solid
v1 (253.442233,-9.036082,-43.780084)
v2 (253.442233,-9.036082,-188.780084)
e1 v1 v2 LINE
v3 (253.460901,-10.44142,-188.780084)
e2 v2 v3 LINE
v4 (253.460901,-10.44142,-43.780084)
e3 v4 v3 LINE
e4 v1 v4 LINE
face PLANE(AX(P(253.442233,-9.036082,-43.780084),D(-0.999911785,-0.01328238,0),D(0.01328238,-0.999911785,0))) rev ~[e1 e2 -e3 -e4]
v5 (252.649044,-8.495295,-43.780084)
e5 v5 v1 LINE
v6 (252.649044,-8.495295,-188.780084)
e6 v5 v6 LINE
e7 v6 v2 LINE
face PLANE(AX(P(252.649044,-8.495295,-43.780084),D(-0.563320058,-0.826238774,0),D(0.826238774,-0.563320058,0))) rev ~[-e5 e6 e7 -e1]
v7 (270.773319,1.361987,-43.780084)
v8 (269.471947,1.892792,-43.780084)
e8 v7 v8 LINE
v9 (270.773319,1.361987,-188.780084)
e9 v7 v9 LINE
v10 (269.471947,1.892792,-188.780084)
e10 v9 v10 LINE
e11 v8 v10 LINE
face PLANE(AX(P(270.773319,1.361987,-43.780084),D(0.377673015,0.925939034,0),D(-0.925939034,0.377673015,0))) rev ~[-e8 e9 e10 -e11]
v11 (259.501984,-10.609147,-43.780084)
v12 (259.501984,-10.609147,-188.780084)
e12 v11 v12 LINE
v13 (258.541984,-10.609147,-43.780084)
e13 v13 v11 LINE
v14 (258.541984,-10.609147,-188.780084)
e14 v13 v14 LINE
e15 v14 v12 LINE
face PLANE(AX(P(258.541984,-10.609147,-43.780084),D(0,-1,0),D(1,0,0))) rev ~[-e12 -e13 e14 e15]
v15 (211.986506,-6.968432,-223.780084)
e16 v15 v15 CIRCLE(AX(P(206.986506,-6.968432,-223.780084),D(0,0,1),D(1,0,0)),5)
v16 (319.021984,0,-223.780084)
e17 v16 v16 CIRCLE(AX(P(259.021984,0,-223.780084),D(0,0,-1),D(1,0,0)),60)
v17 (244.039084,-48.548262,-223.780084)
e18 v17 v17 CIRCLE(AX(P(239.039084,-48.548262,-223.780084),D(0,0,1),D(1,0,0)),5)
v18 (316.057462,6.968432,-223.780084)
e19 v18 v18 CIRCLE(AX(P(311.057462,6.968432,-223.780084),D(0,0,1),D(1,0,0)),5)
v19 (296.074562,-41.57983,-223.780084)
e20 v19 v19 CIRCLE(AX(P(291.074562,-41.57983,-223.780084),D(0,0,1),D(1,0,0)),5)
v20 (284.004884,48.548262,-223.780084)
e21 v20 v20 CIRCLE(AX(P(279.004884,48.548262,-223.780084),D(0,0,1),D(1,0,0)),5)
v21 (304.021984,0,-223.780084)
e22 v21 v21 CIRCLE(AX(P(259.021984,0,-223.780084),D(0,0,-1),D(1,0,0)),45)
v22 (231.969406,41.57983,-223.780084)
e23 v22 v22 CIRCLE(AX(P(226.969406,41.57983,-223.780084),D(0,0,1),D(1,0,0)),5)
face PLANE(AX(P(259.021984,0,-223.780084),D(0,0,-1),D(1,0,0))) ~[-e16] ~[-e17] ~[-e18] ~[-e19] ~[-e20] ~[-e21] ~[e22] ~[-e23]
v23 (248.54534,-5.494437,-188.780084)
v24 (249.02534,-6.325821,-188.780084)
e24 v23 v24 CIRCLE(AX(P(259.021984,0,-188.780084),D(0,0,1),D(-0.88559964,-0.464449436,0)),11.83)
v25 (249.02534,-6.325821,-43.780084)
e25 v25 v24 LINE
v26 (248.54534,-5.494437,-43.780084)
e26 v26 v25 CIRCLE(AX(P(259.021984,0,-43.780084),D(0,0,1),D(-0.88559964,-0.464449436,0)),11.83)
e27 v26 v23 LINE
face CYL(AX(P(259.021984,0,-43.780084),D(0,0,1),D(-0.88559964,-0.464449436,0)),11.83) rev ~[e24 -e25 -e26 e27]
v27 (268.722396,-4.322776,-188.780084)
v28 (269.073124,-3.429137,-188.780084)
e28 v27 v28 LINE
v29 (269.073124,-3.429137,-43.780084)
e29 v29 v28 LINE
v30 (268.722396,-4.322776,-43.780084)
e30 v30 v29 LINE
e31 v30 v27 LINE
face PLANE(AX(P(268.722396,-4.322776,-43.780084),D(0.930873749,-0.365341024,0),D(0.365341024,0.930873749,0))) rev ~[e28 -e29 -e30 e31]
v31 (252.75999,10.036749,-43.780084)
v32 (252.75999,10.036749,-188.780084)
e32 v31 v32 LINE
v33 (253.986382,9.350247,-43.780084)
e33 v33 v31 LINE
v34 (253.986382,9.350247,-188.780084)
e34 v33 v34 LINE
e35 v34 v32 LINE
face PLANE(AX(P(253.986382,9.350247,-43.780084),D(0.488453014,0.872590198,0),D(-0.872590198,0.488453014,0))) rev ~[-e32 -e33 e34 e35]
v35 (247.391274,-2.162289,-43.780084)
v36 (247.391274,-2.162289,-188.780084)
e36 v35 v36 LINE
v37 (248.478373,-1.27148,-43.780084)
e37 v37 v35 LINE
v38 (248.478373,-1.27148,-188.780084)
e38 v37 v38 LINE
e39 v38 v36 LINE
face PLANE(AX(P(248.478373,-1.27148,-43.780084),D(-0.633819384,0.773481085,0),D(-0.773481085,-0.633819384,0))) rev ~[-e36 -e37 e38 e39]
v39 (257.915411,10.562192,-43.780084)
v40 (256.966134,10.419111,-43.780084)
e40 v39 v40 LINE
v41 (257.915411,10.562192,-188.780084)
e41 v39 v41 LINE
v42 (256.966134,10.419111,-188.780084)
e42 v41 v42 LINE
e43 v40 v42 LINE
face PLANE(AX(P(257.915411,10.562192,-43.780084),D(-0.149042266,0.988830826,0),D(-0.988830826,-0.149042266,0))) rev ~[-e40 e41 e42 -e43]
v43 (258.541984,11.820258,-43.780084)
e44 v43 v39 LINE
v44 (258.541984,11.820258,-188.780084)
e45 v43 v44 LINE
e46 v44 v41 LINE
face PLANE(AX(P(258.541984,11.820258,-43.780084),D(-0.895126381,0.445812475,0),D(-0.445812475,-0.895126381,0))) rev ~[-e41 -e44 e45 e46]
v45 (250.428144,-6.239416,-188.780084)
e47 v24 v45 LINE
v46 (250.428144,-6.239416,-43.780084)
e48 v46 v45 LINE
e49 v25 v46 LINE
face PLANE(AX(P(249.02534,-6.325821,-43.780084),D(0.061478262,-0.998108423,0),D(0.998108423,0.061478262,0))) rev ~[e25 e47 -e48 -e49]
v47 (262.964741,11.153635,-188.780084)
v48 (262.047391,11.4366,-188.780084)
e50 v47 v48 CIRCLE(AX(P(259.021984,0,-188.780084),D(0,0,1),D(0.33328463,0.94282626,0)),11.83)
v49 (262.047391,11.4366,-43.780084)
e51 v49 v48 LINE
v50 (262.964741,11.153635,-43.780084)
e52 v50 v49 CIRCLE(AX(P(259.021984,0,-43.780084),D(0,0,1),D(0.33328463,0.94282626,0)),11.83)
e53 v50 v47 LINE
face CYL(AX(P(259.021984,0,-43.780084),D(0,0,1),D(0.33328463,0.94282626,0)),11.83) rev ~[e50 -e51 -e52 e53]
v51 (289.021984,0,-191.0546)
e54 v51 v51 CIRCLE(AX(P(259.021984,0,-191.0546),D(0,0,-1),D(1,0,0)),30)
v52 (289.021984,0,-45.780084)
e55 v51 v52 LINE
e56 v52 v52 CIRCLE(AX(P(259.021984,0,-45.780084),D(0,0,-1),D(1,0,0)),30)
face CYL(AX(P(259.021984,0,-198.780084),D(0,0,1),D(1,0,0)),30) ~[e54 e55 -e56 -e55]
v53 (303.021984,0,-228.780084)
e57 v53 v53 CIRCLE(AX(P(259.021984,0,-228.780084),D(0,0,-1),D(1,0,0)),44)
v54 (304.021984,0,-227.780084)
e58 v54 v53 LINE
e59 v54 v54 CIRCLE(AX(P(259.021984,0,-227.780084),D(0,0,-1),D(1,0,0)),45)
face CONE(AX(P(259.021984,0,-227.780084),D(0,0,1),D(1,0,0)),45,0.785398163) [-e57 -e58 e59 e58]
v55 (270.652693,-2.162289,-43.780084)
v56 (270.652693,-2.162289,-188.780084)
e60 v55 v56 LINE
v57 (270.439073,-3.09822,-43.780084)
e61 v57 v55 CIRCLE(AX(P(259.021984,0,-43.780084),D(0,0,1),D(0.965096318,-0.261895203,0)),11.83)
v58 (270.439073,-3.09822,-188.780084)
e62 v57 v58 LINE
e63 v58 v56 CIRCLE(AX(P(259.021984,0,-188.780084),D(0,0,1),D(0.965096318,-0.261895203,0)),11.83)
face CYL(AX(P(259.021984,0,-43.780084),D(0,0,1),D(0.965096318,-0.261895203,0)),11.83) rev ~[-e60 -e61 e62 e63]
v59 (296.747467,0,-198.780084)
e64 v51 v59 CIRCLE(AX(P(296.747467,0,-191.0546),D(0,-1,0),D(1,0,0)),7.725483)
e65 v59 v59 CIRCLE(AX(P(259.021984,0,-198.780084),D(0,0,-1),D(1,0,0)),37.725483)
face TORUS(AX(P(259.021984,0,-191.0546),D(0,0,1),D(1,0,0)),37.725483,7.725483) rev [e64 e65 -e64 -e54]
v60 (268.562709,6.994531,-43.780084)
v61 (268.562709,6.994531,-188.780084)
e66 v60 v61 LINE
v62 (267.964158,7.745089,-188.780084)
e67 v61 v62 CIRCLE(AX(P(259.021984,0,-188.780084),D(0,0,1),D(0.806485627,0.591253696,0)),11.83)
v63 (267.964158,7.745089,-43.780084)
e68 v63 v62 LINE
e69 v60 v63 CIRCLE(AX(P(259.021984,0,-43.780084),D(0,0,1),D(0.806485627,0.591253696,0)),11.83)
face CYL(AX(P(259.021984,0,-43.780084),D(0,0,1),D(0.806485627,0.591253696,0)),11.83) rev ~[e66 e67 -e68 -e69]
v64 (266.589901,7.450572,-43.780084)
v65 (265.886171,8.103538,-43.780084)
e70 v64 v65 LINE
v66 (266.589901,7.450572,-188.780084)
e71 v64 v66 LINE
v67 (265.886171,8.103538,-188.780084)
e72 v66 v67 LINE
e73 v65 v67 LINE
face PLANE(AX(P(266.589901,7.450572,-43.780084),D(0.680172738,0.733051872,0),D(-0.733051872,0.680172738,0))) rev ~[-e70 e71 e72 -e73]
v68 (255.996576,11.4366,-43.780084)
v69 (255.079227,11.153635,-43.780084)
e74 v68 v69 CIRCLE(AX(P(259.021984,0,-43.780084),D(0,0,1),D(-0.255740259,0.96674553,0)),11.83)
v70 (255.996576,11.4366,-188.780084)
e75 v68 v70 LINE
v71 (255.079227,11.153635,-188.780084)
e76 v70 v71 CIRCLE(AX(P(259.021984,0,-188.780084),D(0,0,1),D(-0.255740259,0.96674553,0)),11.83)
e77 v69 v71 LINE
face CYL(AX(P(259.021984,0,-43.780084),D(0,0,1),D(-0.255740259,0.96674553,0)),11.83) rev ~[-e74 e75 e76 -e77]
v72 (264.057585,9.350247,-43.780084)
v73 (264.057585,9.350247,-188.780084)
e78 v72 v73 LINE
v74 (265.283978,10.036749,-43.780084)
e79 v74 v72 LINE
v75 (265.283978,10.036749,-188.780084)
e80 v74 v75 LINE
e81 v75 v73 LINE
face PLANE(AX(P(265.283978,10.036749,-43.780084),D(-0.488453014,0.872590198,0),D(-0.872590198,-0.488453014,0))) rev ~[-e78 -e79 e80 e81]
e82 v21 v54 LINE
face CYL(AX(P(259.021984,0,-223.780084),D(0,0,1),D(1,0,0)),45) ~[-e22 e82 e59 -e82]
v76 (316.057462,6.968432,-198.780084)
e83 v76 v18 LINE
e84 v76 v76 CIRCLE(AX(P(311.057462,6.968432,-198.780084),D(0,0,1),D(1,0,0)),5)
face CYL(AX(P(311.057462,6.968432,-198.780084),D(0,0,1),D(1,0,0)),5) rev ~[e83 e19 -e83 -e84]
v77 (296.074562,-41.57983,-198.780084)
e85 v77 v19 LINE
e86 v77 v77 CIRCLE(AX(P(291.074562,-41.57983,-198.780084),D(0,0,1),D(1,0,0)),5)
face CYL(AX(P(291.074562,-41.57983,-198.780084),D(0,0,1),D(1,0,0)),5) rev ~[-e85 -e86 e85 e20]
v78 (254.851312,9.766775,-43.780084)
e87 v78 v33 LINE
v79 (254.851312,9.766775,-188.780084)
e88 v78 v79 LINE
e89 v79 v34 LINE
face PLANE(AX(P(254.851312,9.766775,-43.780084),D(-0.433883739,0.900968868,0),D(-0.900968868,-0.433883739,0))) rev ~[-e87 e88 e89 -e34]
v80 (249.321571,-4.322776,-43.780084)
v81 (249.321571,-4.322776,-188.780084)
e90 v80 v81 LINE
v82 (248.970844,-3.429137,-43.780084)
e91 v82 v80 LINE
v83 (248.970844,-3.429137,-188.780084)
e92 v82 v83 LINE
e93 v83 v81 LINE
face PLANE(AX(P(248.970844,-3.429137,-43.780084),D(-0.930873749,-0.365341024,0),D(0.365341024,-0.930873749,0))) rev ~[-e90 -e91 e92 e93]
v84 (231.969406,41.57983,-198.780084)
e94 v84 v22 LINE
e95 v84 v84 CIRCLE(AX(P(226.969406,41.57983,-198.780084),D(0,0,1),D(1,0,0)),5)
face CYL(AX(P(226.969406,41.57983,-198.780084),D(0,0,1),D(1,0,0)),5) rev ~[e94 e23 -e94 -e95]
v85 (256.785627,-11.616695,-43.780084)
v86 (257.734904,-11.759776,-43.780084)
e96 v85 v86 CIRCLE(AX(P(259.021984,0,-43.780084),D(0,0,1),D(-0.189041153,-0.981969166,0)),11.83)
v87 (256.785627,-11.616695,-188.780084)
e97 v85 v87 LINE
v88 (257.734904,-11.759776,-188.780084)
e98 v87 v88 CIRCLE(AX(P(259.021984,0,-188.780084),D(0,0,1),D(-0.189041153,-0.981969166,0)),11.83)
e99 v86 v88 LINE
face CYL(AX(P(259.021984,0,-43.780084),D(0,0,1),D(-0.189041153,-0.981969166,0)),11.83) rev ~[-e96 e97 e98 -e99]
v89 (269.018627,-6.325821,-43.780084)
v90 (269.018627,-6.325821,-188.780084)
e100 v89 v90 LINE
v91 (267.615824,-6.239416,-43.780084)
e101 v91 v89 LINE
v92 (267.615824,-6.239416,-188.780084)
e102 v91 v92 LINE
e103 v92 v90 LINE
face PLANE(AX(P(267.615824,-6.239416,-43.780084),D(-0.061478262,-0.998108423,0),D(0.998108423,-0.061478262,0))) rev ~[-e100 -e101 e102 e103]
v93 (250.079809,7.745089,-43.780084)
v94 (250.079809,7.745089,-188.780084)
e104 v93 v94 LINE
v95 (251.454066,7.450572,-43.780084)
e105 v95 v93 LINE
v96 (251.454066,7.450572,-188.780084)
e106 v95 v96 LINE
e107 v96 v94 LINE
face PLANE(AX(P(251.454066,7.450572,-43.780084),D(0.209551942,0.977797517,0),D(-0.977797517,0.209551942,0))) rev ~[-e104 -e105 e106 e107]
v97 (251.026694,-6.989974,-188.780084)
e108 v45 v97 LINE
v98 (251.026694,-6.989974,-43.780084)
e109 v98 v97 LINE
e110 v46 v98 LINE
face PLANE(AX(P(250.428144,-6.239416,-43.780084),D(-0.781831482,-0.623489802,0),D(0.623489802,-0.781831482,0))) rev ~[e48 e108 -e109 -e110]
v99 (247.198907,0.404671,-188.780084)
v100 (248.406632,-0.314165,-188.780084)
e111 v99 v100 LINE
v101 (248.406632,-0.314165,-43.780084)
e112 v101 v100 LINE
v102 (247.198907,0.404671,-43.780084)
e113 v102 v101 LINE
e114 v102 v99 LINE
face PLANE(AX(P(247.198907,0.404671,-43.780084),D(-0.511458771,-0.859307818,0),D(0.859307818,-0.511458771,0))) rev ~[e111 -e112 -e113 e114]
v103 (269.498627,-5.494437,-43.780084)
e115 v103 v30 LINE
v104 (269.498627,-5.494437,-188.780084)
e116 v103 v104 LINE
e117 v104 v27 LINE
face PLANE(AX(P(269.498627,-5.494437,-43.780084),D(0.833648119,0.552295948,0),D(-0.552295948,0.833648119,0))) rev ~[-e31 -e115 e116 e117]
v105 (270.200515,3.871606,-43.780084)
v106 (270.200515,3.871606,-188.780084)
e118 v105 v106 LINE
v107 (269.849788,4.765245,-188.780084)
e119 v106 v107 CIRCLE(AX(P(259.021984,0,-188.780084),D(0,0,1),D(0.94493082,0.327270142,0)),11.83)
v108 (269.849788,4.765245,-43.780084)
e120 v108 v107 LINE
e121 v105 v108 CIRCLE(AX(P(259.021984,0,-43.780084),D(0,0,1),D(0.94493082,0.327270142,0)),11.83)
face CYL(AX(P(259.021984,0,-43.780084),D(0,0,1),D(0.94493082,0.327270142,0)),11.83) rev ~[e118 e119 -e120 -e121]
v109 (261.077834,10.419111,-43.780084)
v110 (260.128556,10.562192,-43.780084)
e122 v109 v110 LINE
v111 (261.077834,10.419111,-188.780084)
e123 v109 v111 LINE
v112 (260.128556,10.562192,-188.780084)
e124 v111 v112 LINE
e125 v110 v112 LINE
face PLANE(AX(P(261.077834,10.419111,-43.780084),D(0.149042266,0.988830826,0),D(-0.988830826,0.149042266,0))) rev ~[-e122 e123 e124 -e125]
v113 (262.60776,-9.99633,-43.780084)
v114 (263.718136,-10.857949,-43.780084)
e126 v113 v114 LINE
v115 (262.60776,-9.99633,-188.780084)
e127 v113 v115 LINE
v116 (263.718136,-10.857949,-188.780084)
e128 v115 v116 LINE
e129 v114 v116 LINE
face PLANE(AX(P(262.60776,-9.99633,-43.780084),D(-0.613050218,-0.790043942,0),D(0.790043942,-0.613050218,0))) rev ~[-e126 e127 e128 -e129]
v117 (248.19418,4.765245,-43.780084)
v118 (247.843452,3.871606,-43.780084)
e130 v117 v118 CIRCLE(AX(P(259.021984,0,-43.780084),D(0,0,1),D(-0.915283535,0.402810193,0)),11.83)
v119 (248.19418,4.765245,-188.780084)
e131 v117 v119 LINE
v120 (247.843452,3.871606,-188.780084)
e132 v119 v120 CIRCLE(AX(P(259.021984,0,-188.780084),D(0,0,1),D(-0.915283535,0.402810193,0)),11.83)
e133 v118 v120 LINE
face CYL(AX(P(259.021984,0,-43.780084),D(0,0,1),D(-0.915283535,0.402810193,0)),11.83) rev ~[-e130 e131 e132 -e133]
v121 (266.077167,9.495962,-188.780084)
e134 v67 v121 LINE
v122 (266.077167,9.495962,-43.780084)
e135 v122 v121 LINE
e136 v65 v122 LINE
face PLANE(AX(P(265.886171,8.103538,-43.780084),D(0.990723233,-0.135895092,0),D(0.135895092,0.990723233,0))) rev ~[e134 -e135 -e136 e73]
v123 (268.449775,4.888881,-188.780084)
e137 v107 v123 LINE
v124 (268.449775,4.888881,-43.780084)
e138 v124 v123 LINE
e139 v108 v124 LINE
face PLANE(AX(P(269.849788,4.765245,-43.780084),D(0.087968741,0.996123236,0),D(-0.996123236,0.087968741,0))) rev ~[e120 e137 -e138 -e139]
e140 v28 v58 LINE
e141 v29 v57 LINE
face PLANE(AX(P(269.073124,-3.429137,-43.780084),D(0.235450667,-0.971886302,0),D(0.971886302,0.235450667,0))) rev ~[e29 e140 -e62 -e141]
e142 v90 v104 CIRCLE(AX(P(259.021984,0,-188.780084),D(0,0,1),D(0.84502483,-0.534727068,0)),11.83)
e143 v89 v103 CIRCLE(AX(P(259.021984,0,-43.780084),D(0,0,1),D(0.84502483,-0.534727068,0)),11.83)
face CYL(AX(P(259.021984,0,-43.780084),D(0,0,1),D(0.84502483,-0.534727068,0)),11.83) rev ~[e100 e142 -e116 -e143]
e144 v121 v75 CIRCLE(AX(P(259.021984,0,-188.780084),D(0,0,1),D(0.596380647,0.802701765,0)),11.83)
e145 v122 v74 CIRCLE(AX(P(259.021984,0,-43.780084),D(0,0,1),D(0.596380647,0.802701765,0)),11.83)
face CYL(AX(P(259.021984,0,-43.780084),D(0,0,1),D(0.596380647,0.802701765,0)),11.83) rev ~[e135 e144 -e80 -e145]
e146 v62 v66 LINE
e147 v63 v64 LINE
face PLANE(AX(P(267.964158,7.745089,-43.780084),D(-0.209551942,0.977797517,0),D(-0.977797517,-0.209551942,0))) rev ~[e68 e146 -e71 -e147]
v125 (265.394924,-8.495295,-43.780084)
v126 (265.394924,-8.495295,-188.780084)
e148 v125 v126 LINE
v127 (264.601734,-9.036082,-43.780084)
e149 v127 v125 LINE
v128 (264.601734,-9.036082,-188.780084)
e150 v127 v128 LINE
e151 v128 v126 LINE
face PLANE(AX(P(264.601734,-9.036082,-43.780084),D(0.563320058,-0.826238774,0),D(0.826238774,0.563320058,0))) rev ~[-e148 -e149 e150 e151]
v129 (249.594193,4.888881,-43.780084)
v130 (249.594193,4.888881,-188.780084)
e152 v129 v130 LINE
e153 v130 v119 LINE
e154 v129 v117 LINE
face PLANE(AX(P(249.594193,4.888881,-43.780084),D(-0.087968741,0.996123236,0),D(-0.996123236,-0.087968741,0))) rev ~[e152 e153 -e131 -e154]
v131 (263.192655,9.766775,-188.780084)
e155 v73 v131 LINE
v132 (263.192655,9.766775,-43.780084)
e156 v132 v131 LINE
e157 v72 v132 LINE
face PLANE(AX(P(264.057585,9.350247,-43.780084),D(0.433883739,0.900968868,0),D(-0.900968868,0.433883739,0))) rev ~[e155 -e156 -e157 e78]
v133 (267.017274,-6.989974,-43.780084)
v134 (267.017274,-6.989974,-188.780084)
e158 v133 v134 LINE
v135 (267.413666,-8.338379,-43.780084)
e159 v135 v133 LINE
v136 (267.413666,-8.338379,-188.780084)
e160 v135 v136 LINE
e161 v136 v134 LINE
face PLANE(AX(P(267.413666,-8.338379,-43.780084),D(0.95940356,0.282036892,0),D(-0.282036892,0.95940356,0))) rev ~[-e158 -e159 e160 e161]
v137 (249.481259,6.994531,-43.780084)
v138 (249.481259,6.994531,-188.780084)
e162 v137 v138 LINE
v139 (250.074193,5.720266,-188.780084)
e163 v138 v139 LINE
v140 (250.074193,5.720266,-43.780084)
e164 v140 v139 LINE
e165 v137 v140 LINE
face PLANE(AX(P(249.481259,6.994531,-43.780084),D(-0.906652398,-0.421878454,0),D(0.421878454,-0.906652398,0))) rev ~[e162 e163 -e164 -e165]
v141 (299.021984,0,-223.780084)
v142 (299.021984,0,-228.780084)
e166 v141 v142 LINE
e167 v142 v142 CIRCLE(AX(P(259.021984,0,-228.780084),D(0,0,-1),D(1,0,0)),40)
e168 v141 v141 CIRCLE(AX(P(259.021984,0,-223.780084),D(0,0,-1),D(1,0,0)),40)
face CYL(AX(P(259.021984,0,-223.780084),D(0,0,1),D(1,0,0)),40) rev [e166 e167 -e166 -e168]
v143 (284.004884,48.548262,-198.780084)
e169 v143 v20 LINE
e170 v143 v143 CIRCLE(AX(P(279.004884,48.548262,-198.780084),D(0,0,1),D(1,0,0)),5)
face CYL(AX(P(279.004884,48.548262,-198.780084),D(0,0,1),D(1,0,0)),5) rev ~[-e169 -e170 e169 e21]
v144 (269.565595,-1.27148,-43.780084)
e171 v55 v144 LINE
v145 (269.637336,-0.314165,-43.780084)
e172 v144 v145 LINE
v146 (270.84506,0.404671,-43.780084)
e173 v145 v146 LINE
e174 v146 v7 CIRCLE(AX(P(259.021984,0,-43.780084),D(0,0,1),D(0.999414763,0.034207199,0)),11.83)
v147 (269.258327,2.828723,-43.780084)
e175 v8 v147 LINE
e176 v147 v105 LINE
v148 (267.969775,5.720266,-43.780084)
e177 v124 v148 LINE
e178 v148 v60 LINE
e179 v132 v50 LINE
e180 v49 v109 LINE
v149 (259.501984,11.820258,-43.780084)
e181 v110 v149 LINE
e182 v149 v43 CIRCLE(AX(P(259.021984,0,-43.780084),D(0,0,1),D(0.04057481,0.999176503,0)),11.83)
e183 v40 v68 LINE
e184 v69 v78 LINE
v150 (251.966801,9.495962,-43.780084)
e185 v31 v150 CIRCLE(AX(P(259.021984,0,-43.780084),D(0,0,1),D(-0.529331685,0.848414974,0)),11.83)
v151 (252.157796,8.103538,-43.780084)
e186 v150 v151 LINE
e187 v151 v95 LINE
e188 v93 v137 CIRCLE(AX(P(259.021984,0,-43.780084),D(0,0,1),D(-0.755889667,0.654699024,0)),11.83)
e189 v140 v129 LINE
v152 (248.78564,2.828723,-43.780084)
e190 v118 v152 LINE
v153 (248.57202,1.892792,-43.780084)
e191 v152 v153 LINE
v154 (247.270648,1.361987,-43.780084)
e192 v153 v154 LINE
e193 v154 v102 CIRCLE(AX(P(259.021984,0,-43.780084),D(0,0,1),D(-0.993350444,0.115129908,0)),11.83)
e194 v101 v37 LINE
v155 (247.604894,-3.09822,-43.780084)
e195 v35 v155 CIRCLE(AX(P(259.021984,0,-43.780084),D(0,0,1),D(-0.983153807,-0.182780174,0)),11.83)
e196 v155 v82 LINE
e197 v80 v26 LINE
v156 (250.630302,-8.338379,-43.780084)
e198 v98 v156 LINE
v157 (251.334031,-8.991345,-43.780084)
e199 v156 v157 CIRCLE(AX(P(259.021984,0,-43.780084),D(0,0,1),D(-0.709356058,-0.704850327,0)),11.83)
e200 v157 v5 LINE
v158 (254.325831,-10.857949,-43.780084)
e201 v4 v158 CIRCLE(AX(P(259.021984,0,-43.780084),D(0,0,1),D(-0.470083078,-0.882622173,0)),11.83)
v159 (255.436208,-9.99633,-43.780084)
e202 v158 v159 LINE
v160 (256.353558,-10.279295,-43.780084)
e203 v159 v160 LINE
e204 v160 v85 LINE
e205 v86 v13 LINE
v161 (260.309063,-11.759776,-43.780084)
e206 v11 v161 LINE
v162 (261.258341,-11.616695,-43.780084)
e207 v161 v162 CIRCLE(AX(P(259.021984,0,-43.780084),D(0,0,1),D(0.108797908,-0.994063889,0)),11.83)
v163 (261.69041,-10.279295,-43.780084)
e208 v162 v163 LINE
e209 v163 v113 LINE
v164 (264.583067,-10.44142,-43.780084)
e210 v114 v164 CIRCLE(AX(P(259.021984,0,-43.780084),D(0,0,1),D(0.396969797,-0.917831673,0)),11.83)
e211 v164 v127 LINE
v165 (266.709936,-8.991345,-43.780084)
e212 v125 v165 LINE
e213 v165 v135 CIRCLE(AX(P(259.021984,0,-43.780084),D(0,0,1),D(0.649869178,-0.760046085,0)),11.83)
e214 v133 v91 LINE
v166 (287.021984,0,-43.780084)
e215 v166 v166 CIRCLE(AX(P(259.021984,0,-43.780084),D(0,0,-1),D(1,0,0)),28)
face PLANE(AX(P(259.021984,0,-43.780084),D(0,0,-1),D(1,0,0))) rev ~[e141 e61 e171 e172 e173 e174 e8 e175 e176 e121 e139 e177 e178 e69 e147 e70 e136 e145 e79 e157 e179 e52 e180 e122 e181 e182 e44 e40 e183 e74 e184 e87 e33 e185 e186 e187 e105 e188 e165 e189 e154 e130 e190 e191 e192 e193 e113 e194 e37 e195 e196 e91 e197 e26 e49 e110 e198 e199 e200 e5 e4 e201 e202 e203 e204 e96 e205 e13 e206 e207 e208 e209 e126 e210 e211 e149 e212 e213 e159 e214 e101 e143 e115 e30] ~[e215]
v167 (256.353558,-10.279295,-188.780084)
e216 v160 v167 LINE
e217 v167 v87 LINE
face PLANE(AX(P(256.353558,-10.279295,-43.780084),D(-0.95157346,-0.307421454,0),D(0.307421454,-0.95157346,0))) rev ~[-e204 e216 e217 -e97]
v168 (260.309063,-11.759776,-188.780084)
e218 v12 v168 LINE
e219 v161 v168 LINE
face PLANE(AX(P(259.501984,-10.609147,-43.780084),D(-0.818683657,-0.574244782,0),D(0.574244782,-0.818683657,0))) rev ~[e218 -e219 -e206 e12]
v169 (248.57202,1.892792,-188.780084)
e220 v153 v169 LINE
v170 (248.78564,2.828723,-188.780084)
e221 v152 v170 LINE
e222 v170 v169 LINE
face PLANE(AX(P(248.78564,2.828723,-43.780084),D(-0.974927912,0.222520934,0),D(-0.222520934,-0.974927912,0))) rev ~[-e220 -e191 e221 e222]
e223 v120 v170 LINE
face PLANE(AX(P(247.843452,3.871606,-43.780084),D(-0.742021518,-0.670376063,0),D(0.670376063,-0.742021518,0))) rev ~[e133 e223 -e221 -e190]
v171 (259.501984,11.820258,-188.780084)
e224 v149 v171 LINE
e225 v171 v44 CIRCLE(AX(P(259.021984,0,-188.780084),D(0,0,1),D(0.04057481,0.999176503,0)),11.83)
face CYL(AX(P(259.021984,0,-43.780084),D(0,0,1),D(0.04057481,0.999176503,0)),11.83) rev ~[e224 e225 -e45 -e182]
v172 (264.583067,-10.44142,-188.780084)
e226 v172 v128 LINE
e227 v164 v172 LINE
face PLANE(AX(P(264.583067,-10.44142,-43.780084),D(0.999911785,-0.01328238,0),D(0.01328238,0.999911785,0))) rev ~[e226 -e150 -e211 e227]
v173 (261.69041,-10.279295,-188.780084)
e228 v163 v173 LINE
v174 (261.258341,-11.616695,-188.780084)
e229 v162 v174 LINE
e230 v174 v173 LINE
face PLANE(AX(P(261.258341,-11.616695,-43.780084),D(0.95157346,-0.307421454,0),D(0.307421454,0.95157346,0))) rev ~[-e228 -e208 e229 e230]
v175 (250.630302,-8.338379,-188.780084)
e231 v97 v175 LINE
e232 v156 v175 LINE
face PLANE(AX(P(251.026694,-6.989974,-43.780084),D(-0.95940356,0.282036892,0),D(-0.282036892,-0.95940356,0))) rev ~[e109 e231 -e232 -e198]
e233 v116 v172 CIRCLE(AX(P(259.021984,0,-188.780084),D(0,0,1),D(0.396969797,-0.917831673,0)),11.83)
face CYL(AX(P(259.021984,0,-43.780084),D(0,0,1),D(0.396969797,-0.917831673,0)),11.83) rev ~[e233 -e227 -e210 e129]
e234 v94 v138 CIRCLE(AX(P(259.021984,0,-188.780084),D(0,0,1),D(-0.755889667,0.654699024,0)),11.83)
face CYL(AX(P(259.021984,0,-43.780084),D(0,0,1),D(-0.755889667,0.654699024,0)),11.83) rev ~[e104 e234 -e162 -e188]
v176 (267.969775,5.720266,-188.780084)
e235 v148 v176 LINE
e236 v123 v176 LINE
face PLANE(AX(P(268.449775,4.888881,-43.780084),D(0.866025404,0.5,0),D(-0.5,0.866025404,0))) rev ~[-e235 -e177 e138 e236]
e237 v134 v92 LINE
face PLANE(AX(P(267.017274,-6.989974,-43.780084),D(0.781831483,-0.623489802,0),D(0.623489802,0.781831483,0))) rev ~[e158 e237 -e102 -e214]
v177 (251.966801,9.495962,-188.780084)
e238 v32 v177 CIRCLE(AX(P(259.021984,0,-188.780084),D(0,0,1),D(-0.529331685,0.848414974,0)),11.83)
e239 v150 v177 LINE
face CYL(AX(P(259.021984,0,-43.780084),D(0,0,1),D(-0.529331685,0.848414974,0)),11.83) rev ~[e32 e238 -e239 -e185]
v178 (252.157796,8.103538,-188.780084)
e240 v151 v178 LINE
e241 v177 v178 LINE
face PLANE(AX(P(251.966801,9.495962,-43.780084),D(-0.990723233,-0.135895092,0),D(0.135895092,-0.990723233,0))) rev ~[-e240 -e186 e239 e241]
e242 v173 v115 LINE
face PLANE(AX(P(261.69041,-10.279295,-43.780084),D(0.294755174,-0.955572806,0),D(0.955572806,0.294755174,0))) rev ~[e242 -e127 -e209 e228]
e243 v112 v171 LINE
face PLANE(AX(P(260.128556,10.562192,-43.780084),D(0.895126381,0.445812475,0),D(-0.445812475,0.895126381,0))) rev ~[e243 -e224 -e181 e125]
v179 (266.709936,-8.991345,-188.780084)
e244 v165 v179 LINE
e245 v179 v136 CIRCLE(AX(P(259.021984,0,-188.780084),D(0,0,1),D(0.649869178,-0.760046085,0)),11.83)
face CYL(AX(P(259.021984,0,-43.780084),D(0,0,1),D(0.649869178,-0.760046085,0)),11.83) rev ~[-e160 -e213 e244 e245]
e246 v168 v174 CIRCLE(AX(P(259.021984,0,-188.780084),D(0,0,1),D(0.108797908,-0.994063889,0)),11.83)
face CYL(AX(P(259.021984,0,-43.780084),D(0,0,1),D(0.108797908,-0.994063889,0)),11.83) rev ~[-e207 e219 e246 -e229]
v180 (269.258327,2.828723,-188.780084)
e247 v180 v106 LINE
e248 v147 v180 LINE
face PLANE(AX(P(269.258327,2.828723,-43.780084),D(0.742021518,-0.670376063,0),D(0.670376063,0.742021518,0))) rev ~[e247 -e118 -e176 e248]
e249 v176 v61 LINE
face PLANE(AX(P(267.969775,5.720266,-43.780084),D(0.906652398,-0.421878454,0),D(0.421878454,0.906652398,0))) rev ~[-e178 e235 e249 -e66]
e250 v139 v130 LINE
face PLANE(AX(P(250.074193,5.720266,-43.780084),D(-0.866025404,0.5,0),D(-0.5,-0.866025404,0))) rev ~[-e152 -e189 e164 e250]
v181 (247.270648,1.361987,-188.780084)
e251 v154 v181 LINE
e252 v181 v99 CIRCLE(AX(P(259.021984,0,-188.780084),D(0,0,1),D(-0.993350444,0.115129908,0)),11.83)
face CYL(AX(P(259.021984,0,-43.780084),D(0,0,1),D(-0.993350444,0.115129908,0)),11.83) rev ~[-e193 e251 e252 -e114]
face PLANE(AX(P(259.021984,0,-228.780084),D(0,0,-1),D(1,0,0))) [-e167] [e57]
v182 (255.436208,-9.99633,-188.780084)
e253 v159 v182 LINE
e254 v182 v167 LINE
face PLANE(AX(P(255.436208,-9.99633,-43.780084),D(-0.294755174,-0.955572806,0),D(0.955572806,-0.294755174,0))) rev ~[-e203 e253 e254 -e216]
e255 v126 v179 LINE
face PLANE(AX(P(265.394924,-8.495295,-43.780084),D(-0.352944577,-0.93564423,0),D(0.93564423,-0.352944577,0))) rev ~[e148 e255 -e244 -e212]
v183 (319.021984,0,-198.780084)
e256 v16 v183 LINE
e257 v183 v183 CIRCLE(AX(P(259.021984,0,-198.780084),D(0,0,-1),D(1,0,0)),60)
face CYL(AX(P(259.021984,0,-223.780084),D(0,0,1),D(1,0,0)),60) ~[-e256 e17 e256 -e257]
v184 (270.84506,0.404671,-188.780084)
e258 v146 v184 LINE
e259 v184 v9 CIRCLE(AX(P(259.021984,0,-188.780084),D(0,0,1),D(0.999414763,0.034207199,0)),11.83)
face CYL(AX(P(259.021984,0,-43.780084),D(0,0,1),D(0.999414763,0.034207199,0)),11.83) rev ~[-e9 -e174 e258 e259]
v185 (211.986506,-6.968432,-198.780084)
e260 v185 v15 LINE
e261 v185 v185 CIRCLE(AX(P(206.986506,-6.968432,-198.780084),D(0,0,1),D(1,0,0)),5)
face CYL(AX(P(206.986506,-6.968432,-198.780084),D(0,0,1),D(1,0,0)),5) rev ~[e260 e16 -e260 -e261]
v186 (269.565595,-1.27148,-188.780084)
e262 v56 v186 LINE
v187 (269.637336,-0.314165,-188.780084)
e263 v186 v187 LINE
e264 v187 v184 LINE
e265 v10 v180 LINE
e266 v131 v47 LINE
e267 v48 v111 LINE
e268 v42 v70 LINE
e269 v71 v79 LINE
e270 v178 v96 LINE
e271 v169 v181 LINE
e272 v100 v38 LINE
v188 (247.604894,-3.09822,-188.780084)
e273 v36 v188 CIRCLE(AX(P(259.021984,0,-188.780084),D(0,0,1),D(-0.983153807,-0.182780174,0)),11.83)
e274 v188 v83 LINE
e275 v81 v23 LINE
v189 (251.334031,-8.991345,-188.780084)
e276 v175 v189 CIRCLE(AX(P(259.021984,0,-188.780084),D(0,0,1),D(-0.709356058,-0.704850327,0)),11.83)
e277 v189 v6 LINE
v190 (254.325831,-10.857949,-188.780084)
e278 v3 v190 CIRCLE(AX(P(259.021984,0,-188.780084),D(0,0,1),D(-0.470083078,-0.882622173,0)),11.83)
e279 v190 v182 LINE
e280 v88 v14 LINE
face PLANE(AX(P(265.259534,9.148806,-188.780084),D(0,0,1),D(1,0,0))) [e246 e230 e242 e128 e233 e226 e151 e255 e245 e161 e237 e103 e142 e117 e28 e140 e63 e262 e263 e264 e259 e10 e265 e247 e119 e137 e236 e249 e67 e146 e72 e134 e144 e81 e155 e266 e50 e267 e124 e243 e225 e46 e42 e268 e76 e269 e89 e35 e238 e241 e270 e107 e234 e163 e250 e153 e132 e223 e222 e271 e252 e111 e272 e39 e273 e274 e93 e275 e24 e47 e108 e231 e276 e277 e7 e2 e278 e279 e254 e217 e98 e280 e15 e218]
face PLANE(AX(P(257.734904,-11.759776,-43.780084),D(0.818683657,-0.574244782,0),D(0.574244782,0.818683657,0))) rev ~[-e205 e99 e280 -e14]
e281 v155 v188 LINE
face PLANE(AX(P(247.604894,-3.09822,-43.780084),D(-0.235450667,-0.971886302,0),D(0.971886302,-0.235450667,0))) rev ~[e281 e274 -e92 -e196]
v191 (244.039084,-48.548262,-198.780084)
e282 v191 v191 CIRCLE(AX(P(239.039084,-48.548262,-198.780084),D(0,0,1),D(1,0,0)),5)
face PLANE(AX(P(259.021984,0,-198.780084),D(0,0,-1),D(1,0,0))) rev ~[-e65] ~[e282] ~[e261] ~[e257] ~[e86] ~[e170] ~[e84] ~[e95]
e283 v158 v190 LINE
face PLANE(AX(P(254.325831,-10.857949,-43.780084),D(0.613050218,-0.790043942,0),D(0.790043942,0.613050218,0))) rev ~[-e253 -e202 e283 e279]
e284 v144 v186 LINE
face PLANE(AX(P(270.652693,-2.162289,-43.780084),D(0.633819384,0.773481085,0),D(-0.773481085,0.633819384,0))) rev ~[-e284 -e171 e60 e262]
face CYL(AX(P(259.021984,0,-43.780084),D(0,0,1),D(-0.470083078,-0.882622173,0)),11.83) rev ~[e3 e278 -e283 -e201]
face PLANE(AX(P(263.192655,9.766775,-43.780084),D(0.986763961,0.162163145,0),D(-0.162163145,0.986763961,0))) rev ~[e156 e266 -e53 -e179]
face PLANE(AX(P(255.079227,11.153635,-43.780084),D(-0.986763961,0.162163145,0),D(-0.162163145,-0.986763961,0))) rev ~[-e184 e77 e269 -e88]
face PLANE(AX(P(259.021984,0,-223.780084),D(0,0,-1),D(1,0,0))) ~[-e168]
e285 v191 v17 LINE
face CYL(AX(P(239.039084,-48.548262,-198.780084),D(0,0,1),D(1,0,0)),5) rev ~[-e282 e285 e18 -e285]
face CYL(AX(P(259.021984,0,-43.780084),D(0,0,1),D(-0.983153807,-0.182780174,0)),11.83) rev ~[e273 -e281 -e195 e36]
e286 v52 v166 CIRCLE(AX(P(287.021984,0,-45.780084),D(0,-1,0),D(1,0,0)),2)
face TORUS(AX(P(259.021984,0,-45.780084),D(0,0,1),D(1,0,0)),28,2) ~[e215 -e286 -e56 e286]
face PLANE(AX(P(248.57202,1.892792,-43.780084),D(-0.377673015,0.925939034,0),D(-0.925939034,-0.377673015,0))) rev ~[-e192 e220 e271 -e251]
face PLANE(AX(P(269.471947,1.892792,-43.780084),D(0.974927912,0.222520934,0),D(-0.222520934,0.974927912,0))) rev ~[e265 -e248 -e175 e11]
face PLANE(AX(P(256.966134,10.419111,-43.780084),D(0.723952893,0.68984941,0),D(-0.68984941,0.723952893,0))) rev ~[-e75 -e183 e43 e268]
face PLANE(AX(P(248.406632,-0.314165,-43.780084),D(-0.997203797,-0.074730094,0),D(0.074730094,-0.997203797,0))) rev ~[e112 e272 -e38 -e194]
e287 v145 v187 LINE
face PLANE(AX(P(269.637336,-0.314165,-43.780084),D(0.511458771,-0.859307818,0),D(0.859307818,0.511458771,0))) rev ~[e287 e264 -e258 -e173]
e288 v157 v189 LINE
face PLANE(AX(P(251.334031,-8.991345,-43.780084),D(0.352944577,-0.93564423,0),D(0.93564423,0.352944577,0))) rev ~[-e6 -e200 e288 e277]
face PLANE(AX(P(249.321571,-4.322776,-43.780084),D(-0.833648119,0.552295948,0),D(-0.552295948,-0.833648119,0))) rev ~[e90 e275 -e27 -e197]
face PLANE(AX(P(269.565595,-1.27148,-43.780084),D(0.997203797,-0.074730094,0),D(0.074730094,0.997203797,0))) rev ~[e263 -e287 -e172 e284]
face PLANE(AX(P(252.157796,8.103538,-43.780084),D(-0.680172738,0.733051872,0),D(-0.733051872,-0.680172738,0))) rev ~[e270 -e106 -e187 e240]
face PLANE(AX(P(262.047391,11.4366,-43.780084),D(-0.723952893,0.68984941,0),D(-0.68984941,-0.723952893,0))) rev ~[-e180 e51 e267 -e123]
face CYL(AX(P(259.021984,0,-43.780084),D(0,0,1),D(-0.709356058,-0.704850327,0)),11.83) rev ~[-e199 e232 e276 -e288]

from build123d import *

# Parameters (mm, degrees)
F3_DEPTH = 145
F4_R     = 45
F4_R_2   = 40
F5_DEPTH = 5
F6_R     = 5
F7_DEPTH = 63.7
F8_R     = 7.7254833996
F9_R     = 2
F10_SIZE = 1


with BuildPart() as f1:
    # F0 (on Front) → F1 (revolve)
    with BuildSketch(Plane.XZ):
        Polygon((289.0219837427, -43.7800835492), (259.0219837427, -43.7800835492), (259.0219837427, -223.7800835492), (319.0219837427, -223.7800835492), (319.0219837427, -198.7800835492), (289.0219837427, -198.7800835492), align=None)
    revolve(axis=Axis((259.0219837427, 0, -133.7800835492), (0, 0, -1)))

    # F2 (on face) → F3 (cut)
    with BuildSketch(Plane.XY.offset(-43.7800835492)):
        with BuildLine():
            Line((265.8861714025, 8.1035379787), (266.0771667967, 9.4959618826))
            ThreePointArc((266.0771667967, 9.4959618826), (265.6860600296, 9.7744047002), (265.2839775733, 10.0367491383))
            Line((265.2839775733, 10.0367491383), (264.0575851671, 9.3502469644))
            ThreePointArc((264.0575851671, 9.3502469644), (265.0044427593, 8.7746557832), (265.8861714025, 8.1035379787))
        make_face()
        with BuildLine():
            Line((269.5655949679, -1.2714803706), (269.6373358577, -0.3141647253))
            ThreePointArc((269.6373358577, -0.3141647253), (269.6408217079, -0.1570995524), (269.6419837427, 0))
            ThreePointArc((269.6419837427, 0), (269.599389219, 0.9502070251), (269.4719473226, 1.8927919004))
            Line((269.4719473226, 1.8927919004), (269.258327226, 2.8287226961))
            ThreePointArc((269.258327226, 2.8287226961), (268.9078629533, 3.8799216788), (268.4497745544, 4.8888813046))
            Line((268.4497745544, 4.8888813046), (267.9697745544, 5.7202656922))
            ThreePointArc((267.9697745544, 5.7202656922), (267.3250340865, 6.6214616957), (266.5899011994, 7.4505721504))
            Line((266.5899011994, 7.4505721504), (265.8861714025, 8.1035379787))
            ThreePointArc((265.8861714025, 8.1035379787), (265.0044427593, 8.7746557832), (264.0575851671, 9.3502469644))
            Line((264.0575851671, 9.3502469644), (263.1926550539, 9.7667753539))
            ThreePointArc((263.1926550539, 9.7667753539), (262.152283695, 10.1481831974), (261.0778338499, 10.4191113026))
            Line((261.0778338499, 10.4191113026), (260.1285562567, 10.5621918782))
            ThreePointArc((260.1285562567, 10.5621918782), (259.0219837427, 10.62), (257.9154112287, 10.5621918782))
            Line((257.9154112287, 10.5621918782), (256.9661336355, 10.4191113026))
            ThreePointArc((256.9661336355, 10.4191113026), (255.8916837905, 10.1481831974), (254.8513124315, 9.7667753539))
            Line((254.8513124315, 9.7667753539), (253.9863823183, 9.3502469644))
            ThreePointArc((253.9863823183, 9.3502469644), (253.0395247261, 8.7746557832), (252.157796083, 8.1035379787))
            Line((252.157796083, 8.1035379787), (251.454066286, 7.4505721504))
            ThreePointArc((251.454066286, 7.4505721504), (250.7189333989, 6.6214616957), (250.074192931, 5.7202656922))
            Line((250.074192931, 5.7202656922), (249.594192931, 4.8888813046))
            ThreePointArc((249.594192931, 4.8888813046), (249.1361045321, 3.8799216788), (248.7856402594, 2.8287226961))
            Line((248.7856402594, 2.8287226961), (248.5720201628, 1.8927919004))
            ThreePointArc((248.5720201628, 1.8927919004), (248.4316794166, 0.7936335939), (248.4066316277, -0.3141647253))
            Line((248.4066316277, -0.3141647253), (248.4783725176, -1.2714803706))
            ThreePointArc((248.4783725176, -1.2714803706), (248.6682493153, -2.3631723186), (248.9708436162, -3.4291372321))
            Line((248.9708436162, -3.4291372321), (249.3215709996, -4.3227760308))
            ThreePointArc((249.3215709996, -4.3227760308), (249.8247939545, -5.31), (250.4281435136, -6.2394158473))
            Line((250.4281435136, -6.2394158473), (251.0266937234, -6.9899740705))
            ThreePointArc((251.0266937234, -6.9899740705), (251.7985492676, -7.7850108788), (252.6490438288, -8.4952949833))
            Line((252.6490438288, -8.4952949833), (253.4422330521, -9.0360822391))
            ThreePointArc((253.4422330521, -9.0360822391), (254.4141384333, -9.5682893771), (255.4362078225, -9.996329879))
            Line((255.4362078225, -9.996329879), (256.3535577161, -10.2792948465))
            ThreePointArc((256.3535577161, -10.2792948465), (257.4391548759, -10.5013833745), (258.5419837427, -10.6091469968))
            Line((258.5419837427, -10.6091469968), (259.5019837427, -10.6091469968))
            ThreePointArc((259.5019837427, -10.6091469968), (260.6048126095, -10.5013833745), (261.6904097693, -10.2792948465))
            Line((261.6904097693, -10.2792948465), (262.6077596629, -9.996329879))
            ThreePointArc((262.6077596629, -9.996329879), (263.6298290521, -9.5682893771), (264.6017344333, -9.0360822391))
            Line((264.6017344333, -9.0360822391), (265.3949236566, -8.4952949833))
            ThreePointArc((265.3949236566, -8.4952949833), (266.2454182178, -7.7850108788), (267.0172737621, -6.9899740705))
            Line((267.0172737621, -6.9899740705), (267.6158239718, -6.2394158473))
            ThreePointArc((267.6158239718, -6.2394158473), (268.2191735309, -5.31), (268.7223964859, -4.3227760308))
            Line((268.7223964859, -4.3227760308), (269.0731238693, -3.4291372321))
            ThreePointArc((269.0731238693, -3.4291372321), (269.3757181701, -2.3631723186), (269.5655949679, -1.2714803706))
        make_face()
        with BuildLine():
            Line((263.1926550539, 9.7667753539), (262.964740908, 11.1536346513))
            ThreePointArc((262.964740908, 11.1536346513), (262.508937456, 11.3044262925), (262.0473910145, 11.4365996188))
            Line((262.0473910145, 11.4365996188), (261.0778338499, 10.4191113026))
            ThreePointArc((261.0778338499, 10.4191113026), (262.152283695, 10.1481831974), (263.1926550539, 9.7667753539))
        make_face()
        with BuildLine():
            Line((260.1285562567, 10.5621918782), (259.5019837427, 11.8202580344))
            ThreePointArc((259.5019837427, 11.8202580344), (259.0219837427, 11.83), (258.5419837427, 11.8202580344))
            Line((258.5419837427, 11.8202580344), (257.9154112287, 10.5621918782))
            ThreePointArc((257.9154112287, 10.5621918782), (259.0219837427, 10.62), (260.1285562567, 10.5621918782))
        make_face()
        with BuildLine():
            Line((256.9661336355, 10.4191113026), (255.996576471, 11.4365996188))
            ThreePointArc((255.996576471, 11.4365996188), (255.5350300294, 11.3044262925), (255.0792265774, 11.1536346513))
            Line((255.0792265774, 11.1536346513), (254.8513124315, 9.7667753539))
            ThreePointArc((254.8513124315, 9.7667753539), (255.8916837905, 10.1481831974), (256.9661336355, 10.4191113026))
        make_face()
        with BuildLine():
            Line((253.9863823183, 9.3502469644), (252.7599899121, 10.0367491383))
            ThreePointArc((252.7599899121, 10.0367491383), (252.3579074558, 9.7744047002), (251.9668006888, 9.4959618826))
            Line((251.9668006888, 9.4959618826), (252.157796083, 8.1035379787))
            ThreePointArc((252.157796083, 8.1035379787), (253.0395247261, 8.7746557832), (253.9863823183, 9.3502469644))
        make_face()
        with BuildLine():
            Line((251.454066286, 7.4505721504), (250.0798089854, 7.7450894514))
            ThreePointArc((250.0798089854, 7.7450894514), (249.7729173051, 7.375884356), (249.4812587756, 6.9945312282))
            Line((249.4812587756, 6.9945312282), (250.074192931, 5.7202656922))
            ThreePointArc((250.074192931, 5.7202656922), (250.7189333989, 6.6214616957), (251.454066286, 7.4505721504))
        make_face()
        with BuildLine():
            Line((249.594192931, 4.8888813046), (248.194179528, 4.7652445779))
            ThreePointArc((248.194179528, 4.7652445779), (248.0097472963, 4.3219843183), (247.8434521446, 3.8716057792))
            Line((247.8434521446, 3.8716057792), (248.7856402594, 2.8287226961))
            ThreePointArc((248.7856402594, 2.8287226961), (249.1361045321, 3.8799216788), (249.594192931, 4.8888813046))
        make_face()
        with BuildLine():
            Line((248.5720201628, 1.8927919004), (247.2706479921, 1.3619868118))
            ThreePointArc((247.2706479921, 1.3619868118), (247.2250628221, 0.8840570071), (247.1989071022, 0.4046711665))
            Line((247.1989071022, 0.4046711665), (248.4066316277, -0.3141647253))
            ThreePointArc((248.4066316277, -0.3141647253), (248.4316794166, 0.7936335939), (248.5720201628, 1.8927919004))
        make_face()
        with BuildLine():
            ThreePointArc((247.3912742075, -2.1622894596), (247.4885865416, -2.6324226487), (247.6048943041, -3.0982202553))
            Line((247.6048943041, -3.0982202553), (248.9708436162, -3.4291372321))
            ThreePointArc((248.9708436162, -3.4291372321), (248.6682493153, -2.3631723186), (248.4783725176, -1.2714803706))
            Line((248.4783725176, -1.2714803706), (247.3912742075, -2.1622894596))
        make_face()
        with BuildLine():
            ThreePointArc((248.5453400056, -5.4944368234), (248.7769032159, -5.915), (249.0253400056, -6.325821211))
            Line((249.0253400056, -6.325821211), (250.4281435136, -6.2394158473))
            ThreePointArc((250.4281435136, -6.2394158473), (249.8247939545, -5.31), (249.3215709996, -4.3227760308))
            Line((249.3215709996, -4.3227760308), (248.5453400056, -5.4944368234))
        make_face()
        with BuildLine():
            ThreePointArc((250.6303015758, -8.3383793635), (250.9755402549, -8.6720036437), (251.3340313728, -8.9913451918))
            Line((251.3340313728, -8.9913451918), (252.6490438288, -8.4952949833))
            ThreePointArc((252.6490438288, -8.4952949833), (251.7985492676, -7.7850108788), (251.0266937234, -6.9899740705))
            Line((251.0266937234, -6.9899740705), (250.6303015758, -8.3383793635))
        make_face()
        with BuildLine():
            ThreePointArc((253.4609009328, -10.4414203048), (253.889139109, -10.6584617073), (254.325831046, -10.8579486944))
            Line((254.325831046, -10.8579486944), (255.4362078225, -9.996329879))
            ThreePointArc((255.4362078225, -9.996329879), (254.4141384333, -9.5682893771), (253.4422330521, -9.0360822391))
            Line((253.4422330521, -9.0360822391), (253.4609009328, -10.4414203048))
        make_face()
        with BuildLine():
            ThreePointArc((256.7856269019, -11.6166952306), (257.2588137338, -11.6978686742), (257.7349044951, -11.7597758061))
            Line((257.7349044951, -11.7597758061), (258.5419837427, -10.6091469968))
            ThreePointArc((258.5419837427, -10.6091469968), (257.4391548759, -10.5013833745), (256.3535577161, -10.2792948465))
            Line((256.3535577161, -10.2792948465), (256.7856269019, -11.6166952306))
        make_face()
        with BuildLine():
            ThreePointArc((260.3090629904, -11.7597758061), (260.7851537516, -11.6978686742), (261.2583405835, -11.6166952306))
            Line((261.2583405835, -11.6166952306), (261.6904097693, -10.2792948465))
            ThreePointArc((261.6904097693, -10.2792948465), (260.6048126095, -10.5013833745), (259.5019837427, -10.6091469968))
            Line((259.5019837427, -10.6091469968), (260.3090629904, -11.7597758061))
        make_face()
        with BuildLine():
            ThreePointArc((263.7181364394, -10.8579486944), (264.1548283765, -10.6584617073), (264.5830665526, -10.4414203048))
            Line((264.5830665526, -10.4414203048), (264.6017344333, -9.0360822391))
            ThreePointArc((264.6017344333, -9.0360822391), (263.6298290521, -9.5682893771), (262.6077596629, -9.996329879))
            Line((262.6077596629, -9.996329879), (263.7181364394, -10.8579486944))
        make_face()
        with BuildLine():
            ThreePointArc((266.7099361127, -8.9913451918), (267.0684272305, -8.6720036437), (267.4136659096, -8.3383793635))
            Line((267.4136659096, -8.3383793635), (267.0172737621, -6.9899740705))
            ThreePointArc((267.0172737621, -6.9899740705), (266.2454182178, -7.7850108788), (265.3949236566, -8.4952949833))
            Line((265.3949236566, -8.4952949833), (266.7099361127, -8.9913451918))
        make_face()
        with BuildLine():
            ThreePointArc((269.0186274798, -6.325821211), (269.2670642695, -5.915), (269.4986274798, -5.4944368234))
            Line((269.4986274798, -5.4944368234), (268.7223964859, -4.3227760308))
            ThreePointArc((268.7223964859, -4.3227760308), (268.2191735309, -5.31), (267.6158239718, -6.2394158473))
            Line((267.6158239718, -6.2394158473), (269.0186274798, -6.325821211))
        make_face()
        with BuildLine():
            ThreePointArc((270.4390731814, -3.0982202553), (270.5553809438, -2.6324226487), (270.6526932779, -2.1622894596))
            Line((270.6526932779, -2.1622894596), (269.5655949679, -1.2714803706))
            ThreePointArc((269.5655949679, -1.2714803706), (269.3757181701, -2.3631723186), (269.0731238693, -3.4291372321))
            Line((269.0731238693, -3.4291372321), (270.4390731814, -3.0982202553))
        make_face()
        with BuildLine():
            Line((269.6373358577, -0.3141647253), (270.8450603832, 0.4046711665))
            ThreePointArc((270.8450603832, 0.4046711665), (270.8189046634, 0.8840570071), (270.7733194934, 1.3619868118))
            Line((270.7733194934, 1.3619868118), (269.4719473226, 1.8927919004))
            ThreePointArc((269.4719473226, 1.8927919004), (269.599389219, 0.9502070251), (269.6419837427, 0))
            ThreePointArc((269.6419837427, 0), (269.6408217079, -0.1570995524), (269.6373358577, -0.3141647253))
        make_face()
        with BuildLine():
            Line((269.258327226, 2.8287226961), (270.2005153408, 3.8716057792))
            ThreePointArc((270.2005153408, 3.8716057792), (270.0342201892, 4.3219843183), (269.8497879574, 4.7652445779))
            Line((269.8497879574, 4.7652445779), (268.4497745544, 4.8888813046))
            ThreePointArc((268.4497745544, 4.8888813046), (268.9078629533, 3.8799216788), (269.258327226, 2.8287226961))
        make_face()
        with BuildLine():
            Line((267.9697745544, 5.7202656922), (268.5627087098, 6.9945312282))
            ThreePointArc((268.5627087098, 6.9945312282), (268.2710501803, 7.375884356), (267.9641585, 7.7450894514))
            Line((267.9641585, 7.7450894514), (266.5899011994, 7.4505721504))
            ThreePointArc((266.5899011994, 7.4505721504), (267.3250340865, 6.6214616957), (267.9697745544, 5.7202656922))
        make_face()
    extrude(amount=-F3_DEPTH, mode=Mode.SUBTRACT)

    # F4 (on face) → F5 (join)
    with BuildSketch(Plane(origin=(0, 0, -223.7800835492), x_dir=(1, 0, 0), z_dir=(0, 0, -1))):
        with Locations((259.0219837427, 0)):
            Circle(F4_R)
        with Locations((259.0219837427, 0)):
            Circle(F4_R_2, mode=Mode.SUBTRACT)
    extrude(amount=F5_DEPTH)

    # F6 (on face) → F7 (cut)
    with BuildSketch(Plane.XY.offset(-198.7800835492)):
        with Locations((206.986505863, -6.968431806)):
            Circle(F6_R)
        with Locations((226.9694058344, 41.5798298389)):
            Circle(F6_R)
        with Locations((311.0574616224, 6.968431806)):
            Circle(F6_R)
        with Locations((291.0745616511, -41.5798298389)):
            Circle(F6_R)
        with Locations((239.0390837714, -48.5482616448)):
            Circle(F6_R)
        with Locations((279.004883714, 48.5482616448)):
            Circle(F6_R)
    extrude(amount=-F7_DEPTH, mode=Mode.SUBTRACT)

    # F8
    f8_edges = [f1.edges().sort_by_distance(p)[0] for p in [
        (229.021984, 0, -198.780084),
    ]]
    fillet(f8_edges, radius=F8_R)

    # F9
    f9_edges = [f1.edges().sort_by_distance(p)[0] for p in [
        (229.021984, 0, -43.780084),
    ]]
    fillet(f9_edges, radius=F9_R)

    # F10
    f10_edges = [f1.edges().sort_by_distance(p)[0] for p in [
        (214.021984, 0, -228.780084),
    ]]
    chamfer(f10_edges, length=F10_SIZE)


solid = f1.part
